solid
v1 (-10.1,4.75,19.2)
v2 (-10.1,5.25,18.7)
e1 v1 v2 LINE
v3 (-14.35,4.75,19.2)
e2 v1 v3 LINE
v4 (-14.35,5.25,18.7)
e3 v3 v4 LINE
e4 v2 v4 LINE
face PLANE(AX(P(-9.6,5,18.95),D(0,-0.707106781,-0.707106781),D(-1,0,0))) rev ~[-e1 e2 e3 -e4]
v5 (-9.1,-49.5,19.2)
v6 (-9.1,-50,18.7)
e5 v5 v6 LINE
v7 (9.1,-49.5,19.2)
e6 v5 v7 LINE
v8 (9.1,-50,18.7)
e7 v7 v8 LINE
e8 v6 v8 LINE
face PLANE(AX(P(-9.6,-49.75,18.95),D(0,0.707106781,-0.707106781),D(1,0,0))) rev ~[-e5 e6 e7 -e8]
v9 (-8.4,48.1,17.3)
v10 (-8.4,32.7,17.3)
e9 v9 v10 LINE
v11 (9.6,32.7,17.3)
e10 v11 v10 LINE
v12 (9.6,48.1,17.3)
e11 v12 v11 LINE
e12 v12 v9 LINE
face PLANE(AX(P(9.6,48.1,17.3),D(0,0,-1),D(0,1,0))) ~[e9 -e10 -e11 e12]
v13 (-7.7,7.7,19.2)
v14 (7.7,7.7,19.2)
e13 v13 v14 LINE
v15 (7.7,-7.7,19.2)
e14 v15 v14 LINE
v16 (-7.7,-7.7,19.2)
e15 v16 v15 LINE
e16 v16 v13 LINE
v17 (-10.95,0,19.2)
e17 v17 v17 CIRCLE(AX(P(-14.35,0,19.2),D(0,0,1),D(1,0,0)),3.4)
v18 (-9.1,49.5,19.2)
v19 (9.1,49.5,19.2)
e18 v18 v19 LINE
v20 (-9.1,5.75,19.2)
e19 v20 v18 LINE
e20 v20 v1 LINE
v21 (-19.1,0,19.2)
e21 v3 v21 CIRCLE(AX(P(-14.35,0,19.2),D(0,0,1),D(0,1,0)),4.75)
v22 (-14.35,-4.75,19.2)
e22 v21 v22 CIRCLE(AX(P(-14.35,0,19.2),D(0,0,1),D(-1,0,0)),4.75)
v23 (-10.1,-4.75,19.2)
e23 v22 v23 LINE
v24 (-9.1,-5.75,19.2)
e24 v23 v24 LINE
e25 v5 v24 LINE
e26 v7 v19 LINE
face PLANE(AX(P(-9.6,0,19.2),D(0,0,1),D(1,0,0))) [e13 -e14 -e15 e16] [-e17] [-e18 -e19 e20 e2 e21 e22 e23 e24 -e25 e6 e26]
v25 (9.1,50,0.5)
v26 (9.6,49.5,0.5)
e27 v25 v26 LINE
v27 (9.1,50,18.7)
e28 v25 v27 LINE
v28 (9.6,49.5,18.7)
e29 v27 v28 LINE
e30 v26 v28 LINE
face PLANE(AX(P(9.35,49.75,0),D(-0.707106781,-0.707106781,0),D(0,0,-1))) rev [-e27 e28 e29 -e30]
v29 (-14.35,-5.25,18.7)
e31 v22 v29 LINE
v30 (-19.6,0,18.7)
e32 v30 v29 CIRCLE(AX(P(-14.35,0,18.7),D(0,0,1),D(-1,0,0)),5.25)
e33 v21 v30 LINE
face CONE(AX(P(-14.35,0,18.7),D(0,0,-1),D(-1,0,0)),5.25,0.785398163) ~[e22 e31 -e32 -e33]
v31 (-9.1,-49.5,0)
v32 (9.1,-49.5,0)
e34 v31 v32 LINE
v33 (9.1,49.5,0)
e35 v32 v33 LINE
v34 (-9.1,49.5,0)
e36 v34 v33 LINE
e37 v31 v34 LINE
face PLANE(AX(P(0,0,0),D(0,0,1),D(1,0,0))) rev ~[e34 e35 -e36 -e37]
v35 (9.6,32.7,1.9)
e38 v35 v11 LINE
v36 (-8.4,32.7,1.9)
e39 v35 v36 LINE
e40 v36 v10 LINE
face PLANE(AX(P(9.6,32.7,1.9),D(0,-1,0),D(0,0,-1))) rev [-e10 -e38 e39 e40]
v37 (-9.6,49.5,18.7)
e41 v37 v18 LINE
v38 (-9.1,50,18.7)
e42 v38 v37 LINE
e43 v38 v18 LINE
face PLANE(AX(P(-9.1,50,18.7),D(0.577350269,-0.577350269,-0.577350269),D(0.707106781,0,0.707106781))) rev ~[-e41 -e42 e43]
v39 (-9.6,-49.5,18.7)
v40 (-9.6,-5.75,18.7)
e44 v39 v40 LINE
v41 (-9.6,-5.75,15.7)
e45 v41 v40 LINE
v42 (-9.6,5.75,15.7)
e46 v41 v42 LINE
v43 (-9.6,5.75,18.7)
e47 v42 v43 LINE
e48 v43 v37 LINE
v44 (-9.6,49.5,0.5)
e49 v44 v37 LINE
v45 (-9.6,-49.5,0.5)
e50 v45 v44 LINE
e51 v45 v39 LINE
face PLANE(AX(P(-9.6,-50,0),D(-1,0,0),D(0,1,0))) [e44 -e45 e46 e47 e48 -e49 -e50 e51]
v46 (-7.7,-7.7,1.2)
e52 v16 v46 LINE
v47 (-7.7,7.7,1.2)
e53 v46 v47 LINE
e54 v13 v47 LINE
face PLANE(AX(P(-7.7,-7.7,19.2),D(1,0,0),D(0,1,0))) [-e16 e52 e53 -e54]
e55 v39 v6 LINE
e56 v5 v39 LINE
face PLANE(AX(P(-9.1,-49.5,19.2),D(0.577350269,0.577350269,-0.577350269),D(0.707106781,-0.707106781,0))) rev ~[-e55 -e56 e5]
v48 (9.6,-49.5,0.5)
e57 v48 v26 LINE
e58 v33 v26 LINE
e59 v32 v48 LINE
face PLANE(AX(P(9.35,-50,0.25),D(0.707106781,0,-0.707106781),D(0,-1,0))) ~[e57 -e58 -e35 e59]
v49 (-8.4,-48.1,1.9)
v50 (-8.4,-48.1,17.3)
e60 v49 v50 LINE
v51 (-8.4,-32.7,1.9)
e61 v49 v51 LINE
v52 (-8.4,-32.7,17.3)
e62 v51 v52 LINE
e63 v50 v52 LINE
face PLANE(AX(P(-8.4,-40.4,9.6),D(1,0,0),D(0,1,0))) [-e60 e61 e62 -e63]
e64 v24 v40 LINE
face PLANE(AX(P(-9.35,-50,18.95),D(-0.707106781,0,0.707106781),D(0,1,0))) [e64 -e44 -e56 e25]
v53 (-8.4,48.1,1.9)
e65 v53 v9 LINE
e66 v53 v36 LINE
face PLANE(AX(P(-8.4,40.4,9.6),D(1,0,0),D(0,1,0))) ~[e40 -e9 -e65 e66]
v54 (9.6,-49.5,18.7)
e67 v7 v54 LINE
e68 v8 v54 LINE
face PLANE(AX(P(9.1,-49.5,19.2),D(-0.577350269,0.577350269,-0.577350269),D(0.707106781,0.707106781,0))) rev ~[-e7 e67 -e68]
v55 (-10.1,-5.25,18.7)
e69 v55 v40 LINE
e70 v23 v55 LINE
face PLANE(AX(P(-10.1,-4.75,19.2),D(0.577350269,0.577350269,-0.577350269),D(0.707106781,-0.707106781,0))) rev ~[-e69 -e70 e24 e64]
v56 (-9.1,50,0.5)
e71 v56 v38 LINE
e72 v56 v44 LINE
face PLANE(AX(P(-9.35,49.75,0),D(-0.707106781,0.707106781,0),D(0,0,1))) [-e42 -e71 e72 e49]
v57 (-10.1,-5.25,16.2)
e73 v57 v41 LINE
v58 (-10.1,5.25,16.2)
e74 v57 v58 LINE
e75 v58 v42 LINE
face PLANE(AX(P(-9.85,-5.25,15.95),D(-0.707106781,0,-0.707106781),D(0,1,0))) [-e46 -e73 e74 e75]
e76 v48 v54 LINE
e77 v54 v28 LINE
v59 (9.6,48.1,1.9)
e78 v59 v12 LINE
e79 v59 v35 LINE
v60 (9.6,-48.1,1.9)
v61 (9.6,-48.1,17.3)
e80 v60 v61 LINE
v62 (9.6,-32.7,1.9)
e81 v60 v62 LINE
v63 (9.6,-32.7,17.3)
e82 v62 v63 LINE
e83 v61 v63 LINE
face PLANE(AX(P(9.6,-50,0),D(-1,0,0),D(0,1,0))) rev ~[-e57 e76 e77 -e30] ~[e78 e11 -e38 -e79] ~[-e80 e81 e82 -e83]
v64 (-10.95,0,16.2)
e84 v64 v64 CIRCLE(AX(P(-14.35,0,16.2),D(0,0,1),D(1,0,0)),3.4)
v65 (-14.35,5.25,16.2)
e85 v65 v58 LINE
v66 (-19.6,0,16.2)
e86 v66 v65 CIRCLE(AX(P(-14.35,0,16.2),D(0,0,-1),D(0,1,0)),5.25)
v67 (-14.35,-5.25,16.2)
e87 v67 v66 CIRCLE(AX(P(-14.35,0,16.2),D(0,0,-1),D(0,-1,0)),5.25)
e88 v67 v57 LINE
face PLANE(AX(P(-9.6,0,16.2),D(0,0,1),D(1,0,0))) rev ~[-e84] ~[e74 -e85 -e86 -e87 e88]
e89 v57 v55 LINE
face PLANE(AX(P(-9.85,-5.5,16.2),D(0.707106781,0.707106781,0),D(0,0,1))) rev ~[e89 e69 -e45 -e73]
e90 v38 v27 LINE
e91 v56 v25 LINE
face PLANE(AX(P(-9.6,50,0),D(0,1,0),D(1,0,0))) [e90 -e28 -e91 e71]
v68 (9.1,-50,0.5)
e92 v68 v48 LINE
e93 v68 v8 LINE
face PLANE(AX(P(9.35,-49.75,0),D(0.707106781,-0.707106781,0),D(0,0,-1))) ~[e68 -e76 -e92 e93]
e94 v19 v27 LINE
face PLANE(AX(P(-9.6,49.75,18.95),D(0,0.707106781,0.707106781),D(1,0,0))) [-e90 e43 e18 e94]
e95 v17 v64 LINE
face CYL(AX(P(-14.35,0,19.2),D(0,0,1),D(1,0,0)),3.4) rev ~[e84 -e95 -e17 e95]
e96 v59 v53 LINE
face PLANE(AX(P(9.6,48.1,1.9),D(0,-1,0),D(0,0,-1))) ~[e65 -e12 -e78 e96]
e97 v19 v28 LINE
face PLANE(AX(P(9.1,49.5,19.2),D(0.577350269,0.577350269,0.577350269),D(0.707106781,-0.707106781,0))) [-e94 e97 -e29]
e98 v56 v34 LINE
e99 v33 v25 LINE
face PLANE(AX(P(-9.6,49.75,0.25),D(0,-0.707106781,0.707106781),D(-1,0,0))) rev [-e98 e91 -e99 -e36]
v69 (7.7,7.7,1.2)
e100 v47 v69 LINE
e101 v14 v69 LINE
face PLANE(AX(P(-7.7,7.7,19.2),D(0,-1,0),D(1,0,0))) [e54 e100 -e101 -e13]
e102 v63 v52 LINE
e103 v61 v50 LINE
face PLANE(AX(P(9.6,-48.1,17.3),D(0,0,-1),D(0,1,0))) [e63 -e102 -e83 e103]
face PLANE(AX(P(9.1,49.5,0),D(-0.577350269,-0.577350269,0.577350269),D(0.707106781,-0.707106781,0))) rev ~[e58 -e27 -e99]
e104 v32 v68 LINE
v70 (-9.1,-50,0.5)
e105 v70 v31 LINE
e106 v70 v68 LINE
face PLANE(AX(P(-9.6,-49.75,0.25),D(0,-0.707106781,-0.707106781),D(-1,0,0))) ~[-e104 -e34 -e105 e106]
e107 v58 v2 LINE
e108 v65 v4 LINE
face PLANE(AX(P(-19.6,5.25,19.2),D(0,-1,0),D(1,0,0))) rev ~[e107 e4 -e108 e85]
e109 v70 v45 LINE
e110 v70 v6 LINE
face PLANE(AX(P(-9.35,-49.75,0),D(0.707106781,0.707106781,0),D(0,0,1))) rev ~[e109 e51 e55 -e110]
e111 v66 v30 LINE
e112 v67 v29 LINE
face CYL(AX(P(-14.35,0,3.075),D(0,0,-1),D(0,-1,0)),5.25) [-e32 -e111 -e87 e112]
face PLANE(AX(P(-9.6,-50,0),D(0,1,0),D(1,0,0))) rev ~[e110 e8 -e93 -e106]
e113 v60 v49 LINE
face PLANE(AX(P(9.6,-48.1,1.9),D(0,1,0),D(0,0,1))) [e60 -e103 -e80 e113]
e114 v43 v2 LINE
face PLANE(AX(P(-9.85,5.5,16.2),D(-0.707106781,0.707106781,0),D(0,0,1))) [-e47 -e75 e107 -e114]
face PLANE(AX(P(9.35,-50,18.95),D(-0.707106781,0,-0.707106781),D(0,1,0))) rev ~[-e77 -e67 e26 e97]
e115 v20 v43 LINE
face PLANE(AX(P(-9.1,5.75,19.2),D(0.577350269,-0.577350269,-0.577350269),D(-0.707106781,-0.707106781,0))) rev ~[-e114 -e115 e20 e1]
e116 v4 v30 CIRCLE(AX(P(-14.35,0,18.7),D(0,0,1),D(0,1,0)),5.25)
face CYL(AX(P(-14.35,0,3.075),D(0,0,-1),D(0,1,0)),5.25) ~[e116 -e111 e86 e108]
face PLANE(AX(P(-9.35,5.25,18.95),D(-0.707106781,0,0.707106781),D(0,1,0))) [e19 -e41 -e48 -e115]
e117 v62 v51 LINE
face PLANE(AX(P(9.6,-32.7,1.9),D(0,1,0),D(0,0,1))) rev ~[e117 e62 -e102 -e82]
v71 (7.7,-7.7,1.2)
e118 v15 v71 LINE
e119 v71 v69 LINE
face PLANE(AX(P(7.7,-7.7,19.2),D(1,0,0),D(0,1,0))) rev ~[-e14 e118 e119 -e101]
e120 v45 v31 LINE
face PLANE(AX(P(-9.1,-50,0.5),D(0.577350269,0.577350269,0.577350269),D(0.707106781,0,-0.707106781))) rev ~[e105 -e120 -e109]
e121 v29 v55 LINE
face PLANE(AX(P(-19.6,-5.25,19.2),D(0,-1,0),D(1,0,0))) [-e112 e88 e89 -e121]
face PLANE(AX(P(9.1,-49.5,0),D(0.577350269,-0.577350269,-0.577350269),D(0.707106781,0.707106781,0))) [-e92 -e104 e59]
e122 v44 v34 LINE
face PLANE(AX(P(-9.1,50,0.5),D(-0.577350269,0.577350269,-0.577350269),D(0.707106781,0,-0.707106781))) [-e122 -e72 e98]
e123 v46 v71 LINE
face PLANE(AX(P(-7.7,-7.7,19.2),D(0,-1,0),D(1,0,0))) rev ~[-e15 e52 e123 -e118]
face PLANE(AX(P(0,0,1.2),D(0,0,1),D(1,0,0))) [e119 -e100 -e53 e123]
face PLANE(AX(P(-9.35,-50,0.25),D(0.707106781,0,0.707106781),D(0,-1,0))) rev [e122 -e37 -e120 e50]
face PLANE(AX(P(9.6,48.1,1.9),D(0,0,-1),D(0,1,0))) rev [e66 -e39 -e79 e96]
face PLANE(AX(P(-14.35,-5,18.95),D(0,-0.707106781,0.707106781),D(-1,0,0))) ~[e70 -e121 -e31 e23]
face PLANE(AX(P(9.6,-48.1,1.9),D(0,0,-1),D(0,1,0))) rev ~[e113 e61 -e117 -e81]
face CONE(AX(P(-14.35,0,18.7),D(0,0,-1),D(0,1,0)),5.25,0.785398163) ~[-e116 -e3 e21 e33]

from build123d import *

# Parameters (mm, degrees)
F0_W        = 19.2
F0_H        = 100
F1_DEPTH    = 19.2
F2_W        = 15.4
F2_H        = 15.4
F3_DEPTH    = 18
F4_W        = 20
F4_H        = 10.5
F5_DEPTH    = 3
F6_T1_DEPTH = 29.25
F7_R        = 3.4
F8_DEPTH    = 25
F9_SIZE     = 0.5
F11_W       = 15.4
F11_H       = 15.4
F12_DEPTH   = 18


# Not quite as in the source:
# - a fillet or chamfer that OpenCascade refuses, or shapes differently, is made with other operations: its cross-section is extruded or revolved along the edge and cut away or added
# - a pattern or mirror of a feature is missing from the dataset's text; its kind, count and spacing are read off the source's solid


with BuildPart() as f1:
    # F0 (on Top) → F1 (new body)
    with BuildSketch(Plane.XY):
        Rectangle(F0_W, F0_H)
    extrude(amount=F1_DEPTH)

    # F2 (on face) → F3 (cut)
    with BuildSketch(Plane.YZ.offset(9.6)):
        with Locations((-40.4, 9.6)):
            Rectangle(F2_W, F2_H)
    f3 = extrude(amount=-F3_DEPTH, mode=Mode.SUBTRACT)

    # F3_copies: F3 across plane
    add(f3.mirror(Plane.ZX), mode=Mode.SUBTRACT)

    # F4 (on face) → F5 (join)
    with BuildSketch(Plane.XY.offset(19.2)):
        with Locations((-9.6, 0)):
            Rectangle(F4_W, F4_H)
    extrude(amount=-F5_DEPTH)

    # F6: fillet of radius 5.25 on 2 edges, made by hand

    # F6_s2 → F6_t1 (cut)
    with BuildSketch(Plane.XY.offset(3.075)):
        with BuildLine():
            ThreePointArc((-14.35, 5.25), (-18.0623106012, 3.7123106012), (-19.6, 0))
            Line((-19.6, 0), (-19.6, 5.25))
            Line((-19.6, 5.25), (-14.35, 5.25))
        make_face()
        with BuildLine():
            ThreePointArc((-14.35, -5.25), (-18.0623106012, -3.7123106012), (-19.6, 0))
            Line((-19.6, 0), (-19.6, -5.25))
            Line((-19.6, -5.25), (-14.35, -5.25))
        make_face()
    extrude(amount=F6_T1_DEPTH, mode=Mode.SUBTRACT)

    # F7 (on face) → F8 (cut)
    with BuildSketch(Plane.XY.offset(19.2)):
        with Locations((-14.35, 0)):
            Circle(F7_R)
    extrude(amount=-F8_DEPTH, mode=Mode.SUBTRACT)

    # F9
    f9_edges = [f1.edges().sort_by_distance(p)[0] for p in [
        (-9.6, 0, 0),
        (-9.6, -50, 9.6),
        (-9.6, -27.625, 19.2),
        (-9.6, -5.25, 17.7),
        (-9.6, 0, 16.2),
        (-9.6, 5.25, 17.7),
        (-9.6, 27.625, 19.2),
        (-9.6, 50, 9.6),
        (9.6, -50, 9.6),
        (0, -50, 0),
        (0, -50, 19.2),
        (9.6, 50, 9.6),
        (0, 50, 0),
        (0, 50, 19.2),
        (9.6, 0, 0),
        (9.6, 0, 19.2),
        (-11.975, -5.25, 19.2),
        (-18.062311, -3.712311, 19.2),
        (-18.062311, 3.712311, 19.2),
        (-11.975, 5.25, 19.2),
    ]]
    chamfer(f9_edges, length=F9_SIZE)

    # F11 (on face) → F12 (cut)
    with BuildSketch(Plane.XY.offset(19.2)):
        Rectangle(F11_W, F11_H)
    extrude(amount=-F12_DEPTH, mode=Mode.SUBTRACT)


solid = f1.part
